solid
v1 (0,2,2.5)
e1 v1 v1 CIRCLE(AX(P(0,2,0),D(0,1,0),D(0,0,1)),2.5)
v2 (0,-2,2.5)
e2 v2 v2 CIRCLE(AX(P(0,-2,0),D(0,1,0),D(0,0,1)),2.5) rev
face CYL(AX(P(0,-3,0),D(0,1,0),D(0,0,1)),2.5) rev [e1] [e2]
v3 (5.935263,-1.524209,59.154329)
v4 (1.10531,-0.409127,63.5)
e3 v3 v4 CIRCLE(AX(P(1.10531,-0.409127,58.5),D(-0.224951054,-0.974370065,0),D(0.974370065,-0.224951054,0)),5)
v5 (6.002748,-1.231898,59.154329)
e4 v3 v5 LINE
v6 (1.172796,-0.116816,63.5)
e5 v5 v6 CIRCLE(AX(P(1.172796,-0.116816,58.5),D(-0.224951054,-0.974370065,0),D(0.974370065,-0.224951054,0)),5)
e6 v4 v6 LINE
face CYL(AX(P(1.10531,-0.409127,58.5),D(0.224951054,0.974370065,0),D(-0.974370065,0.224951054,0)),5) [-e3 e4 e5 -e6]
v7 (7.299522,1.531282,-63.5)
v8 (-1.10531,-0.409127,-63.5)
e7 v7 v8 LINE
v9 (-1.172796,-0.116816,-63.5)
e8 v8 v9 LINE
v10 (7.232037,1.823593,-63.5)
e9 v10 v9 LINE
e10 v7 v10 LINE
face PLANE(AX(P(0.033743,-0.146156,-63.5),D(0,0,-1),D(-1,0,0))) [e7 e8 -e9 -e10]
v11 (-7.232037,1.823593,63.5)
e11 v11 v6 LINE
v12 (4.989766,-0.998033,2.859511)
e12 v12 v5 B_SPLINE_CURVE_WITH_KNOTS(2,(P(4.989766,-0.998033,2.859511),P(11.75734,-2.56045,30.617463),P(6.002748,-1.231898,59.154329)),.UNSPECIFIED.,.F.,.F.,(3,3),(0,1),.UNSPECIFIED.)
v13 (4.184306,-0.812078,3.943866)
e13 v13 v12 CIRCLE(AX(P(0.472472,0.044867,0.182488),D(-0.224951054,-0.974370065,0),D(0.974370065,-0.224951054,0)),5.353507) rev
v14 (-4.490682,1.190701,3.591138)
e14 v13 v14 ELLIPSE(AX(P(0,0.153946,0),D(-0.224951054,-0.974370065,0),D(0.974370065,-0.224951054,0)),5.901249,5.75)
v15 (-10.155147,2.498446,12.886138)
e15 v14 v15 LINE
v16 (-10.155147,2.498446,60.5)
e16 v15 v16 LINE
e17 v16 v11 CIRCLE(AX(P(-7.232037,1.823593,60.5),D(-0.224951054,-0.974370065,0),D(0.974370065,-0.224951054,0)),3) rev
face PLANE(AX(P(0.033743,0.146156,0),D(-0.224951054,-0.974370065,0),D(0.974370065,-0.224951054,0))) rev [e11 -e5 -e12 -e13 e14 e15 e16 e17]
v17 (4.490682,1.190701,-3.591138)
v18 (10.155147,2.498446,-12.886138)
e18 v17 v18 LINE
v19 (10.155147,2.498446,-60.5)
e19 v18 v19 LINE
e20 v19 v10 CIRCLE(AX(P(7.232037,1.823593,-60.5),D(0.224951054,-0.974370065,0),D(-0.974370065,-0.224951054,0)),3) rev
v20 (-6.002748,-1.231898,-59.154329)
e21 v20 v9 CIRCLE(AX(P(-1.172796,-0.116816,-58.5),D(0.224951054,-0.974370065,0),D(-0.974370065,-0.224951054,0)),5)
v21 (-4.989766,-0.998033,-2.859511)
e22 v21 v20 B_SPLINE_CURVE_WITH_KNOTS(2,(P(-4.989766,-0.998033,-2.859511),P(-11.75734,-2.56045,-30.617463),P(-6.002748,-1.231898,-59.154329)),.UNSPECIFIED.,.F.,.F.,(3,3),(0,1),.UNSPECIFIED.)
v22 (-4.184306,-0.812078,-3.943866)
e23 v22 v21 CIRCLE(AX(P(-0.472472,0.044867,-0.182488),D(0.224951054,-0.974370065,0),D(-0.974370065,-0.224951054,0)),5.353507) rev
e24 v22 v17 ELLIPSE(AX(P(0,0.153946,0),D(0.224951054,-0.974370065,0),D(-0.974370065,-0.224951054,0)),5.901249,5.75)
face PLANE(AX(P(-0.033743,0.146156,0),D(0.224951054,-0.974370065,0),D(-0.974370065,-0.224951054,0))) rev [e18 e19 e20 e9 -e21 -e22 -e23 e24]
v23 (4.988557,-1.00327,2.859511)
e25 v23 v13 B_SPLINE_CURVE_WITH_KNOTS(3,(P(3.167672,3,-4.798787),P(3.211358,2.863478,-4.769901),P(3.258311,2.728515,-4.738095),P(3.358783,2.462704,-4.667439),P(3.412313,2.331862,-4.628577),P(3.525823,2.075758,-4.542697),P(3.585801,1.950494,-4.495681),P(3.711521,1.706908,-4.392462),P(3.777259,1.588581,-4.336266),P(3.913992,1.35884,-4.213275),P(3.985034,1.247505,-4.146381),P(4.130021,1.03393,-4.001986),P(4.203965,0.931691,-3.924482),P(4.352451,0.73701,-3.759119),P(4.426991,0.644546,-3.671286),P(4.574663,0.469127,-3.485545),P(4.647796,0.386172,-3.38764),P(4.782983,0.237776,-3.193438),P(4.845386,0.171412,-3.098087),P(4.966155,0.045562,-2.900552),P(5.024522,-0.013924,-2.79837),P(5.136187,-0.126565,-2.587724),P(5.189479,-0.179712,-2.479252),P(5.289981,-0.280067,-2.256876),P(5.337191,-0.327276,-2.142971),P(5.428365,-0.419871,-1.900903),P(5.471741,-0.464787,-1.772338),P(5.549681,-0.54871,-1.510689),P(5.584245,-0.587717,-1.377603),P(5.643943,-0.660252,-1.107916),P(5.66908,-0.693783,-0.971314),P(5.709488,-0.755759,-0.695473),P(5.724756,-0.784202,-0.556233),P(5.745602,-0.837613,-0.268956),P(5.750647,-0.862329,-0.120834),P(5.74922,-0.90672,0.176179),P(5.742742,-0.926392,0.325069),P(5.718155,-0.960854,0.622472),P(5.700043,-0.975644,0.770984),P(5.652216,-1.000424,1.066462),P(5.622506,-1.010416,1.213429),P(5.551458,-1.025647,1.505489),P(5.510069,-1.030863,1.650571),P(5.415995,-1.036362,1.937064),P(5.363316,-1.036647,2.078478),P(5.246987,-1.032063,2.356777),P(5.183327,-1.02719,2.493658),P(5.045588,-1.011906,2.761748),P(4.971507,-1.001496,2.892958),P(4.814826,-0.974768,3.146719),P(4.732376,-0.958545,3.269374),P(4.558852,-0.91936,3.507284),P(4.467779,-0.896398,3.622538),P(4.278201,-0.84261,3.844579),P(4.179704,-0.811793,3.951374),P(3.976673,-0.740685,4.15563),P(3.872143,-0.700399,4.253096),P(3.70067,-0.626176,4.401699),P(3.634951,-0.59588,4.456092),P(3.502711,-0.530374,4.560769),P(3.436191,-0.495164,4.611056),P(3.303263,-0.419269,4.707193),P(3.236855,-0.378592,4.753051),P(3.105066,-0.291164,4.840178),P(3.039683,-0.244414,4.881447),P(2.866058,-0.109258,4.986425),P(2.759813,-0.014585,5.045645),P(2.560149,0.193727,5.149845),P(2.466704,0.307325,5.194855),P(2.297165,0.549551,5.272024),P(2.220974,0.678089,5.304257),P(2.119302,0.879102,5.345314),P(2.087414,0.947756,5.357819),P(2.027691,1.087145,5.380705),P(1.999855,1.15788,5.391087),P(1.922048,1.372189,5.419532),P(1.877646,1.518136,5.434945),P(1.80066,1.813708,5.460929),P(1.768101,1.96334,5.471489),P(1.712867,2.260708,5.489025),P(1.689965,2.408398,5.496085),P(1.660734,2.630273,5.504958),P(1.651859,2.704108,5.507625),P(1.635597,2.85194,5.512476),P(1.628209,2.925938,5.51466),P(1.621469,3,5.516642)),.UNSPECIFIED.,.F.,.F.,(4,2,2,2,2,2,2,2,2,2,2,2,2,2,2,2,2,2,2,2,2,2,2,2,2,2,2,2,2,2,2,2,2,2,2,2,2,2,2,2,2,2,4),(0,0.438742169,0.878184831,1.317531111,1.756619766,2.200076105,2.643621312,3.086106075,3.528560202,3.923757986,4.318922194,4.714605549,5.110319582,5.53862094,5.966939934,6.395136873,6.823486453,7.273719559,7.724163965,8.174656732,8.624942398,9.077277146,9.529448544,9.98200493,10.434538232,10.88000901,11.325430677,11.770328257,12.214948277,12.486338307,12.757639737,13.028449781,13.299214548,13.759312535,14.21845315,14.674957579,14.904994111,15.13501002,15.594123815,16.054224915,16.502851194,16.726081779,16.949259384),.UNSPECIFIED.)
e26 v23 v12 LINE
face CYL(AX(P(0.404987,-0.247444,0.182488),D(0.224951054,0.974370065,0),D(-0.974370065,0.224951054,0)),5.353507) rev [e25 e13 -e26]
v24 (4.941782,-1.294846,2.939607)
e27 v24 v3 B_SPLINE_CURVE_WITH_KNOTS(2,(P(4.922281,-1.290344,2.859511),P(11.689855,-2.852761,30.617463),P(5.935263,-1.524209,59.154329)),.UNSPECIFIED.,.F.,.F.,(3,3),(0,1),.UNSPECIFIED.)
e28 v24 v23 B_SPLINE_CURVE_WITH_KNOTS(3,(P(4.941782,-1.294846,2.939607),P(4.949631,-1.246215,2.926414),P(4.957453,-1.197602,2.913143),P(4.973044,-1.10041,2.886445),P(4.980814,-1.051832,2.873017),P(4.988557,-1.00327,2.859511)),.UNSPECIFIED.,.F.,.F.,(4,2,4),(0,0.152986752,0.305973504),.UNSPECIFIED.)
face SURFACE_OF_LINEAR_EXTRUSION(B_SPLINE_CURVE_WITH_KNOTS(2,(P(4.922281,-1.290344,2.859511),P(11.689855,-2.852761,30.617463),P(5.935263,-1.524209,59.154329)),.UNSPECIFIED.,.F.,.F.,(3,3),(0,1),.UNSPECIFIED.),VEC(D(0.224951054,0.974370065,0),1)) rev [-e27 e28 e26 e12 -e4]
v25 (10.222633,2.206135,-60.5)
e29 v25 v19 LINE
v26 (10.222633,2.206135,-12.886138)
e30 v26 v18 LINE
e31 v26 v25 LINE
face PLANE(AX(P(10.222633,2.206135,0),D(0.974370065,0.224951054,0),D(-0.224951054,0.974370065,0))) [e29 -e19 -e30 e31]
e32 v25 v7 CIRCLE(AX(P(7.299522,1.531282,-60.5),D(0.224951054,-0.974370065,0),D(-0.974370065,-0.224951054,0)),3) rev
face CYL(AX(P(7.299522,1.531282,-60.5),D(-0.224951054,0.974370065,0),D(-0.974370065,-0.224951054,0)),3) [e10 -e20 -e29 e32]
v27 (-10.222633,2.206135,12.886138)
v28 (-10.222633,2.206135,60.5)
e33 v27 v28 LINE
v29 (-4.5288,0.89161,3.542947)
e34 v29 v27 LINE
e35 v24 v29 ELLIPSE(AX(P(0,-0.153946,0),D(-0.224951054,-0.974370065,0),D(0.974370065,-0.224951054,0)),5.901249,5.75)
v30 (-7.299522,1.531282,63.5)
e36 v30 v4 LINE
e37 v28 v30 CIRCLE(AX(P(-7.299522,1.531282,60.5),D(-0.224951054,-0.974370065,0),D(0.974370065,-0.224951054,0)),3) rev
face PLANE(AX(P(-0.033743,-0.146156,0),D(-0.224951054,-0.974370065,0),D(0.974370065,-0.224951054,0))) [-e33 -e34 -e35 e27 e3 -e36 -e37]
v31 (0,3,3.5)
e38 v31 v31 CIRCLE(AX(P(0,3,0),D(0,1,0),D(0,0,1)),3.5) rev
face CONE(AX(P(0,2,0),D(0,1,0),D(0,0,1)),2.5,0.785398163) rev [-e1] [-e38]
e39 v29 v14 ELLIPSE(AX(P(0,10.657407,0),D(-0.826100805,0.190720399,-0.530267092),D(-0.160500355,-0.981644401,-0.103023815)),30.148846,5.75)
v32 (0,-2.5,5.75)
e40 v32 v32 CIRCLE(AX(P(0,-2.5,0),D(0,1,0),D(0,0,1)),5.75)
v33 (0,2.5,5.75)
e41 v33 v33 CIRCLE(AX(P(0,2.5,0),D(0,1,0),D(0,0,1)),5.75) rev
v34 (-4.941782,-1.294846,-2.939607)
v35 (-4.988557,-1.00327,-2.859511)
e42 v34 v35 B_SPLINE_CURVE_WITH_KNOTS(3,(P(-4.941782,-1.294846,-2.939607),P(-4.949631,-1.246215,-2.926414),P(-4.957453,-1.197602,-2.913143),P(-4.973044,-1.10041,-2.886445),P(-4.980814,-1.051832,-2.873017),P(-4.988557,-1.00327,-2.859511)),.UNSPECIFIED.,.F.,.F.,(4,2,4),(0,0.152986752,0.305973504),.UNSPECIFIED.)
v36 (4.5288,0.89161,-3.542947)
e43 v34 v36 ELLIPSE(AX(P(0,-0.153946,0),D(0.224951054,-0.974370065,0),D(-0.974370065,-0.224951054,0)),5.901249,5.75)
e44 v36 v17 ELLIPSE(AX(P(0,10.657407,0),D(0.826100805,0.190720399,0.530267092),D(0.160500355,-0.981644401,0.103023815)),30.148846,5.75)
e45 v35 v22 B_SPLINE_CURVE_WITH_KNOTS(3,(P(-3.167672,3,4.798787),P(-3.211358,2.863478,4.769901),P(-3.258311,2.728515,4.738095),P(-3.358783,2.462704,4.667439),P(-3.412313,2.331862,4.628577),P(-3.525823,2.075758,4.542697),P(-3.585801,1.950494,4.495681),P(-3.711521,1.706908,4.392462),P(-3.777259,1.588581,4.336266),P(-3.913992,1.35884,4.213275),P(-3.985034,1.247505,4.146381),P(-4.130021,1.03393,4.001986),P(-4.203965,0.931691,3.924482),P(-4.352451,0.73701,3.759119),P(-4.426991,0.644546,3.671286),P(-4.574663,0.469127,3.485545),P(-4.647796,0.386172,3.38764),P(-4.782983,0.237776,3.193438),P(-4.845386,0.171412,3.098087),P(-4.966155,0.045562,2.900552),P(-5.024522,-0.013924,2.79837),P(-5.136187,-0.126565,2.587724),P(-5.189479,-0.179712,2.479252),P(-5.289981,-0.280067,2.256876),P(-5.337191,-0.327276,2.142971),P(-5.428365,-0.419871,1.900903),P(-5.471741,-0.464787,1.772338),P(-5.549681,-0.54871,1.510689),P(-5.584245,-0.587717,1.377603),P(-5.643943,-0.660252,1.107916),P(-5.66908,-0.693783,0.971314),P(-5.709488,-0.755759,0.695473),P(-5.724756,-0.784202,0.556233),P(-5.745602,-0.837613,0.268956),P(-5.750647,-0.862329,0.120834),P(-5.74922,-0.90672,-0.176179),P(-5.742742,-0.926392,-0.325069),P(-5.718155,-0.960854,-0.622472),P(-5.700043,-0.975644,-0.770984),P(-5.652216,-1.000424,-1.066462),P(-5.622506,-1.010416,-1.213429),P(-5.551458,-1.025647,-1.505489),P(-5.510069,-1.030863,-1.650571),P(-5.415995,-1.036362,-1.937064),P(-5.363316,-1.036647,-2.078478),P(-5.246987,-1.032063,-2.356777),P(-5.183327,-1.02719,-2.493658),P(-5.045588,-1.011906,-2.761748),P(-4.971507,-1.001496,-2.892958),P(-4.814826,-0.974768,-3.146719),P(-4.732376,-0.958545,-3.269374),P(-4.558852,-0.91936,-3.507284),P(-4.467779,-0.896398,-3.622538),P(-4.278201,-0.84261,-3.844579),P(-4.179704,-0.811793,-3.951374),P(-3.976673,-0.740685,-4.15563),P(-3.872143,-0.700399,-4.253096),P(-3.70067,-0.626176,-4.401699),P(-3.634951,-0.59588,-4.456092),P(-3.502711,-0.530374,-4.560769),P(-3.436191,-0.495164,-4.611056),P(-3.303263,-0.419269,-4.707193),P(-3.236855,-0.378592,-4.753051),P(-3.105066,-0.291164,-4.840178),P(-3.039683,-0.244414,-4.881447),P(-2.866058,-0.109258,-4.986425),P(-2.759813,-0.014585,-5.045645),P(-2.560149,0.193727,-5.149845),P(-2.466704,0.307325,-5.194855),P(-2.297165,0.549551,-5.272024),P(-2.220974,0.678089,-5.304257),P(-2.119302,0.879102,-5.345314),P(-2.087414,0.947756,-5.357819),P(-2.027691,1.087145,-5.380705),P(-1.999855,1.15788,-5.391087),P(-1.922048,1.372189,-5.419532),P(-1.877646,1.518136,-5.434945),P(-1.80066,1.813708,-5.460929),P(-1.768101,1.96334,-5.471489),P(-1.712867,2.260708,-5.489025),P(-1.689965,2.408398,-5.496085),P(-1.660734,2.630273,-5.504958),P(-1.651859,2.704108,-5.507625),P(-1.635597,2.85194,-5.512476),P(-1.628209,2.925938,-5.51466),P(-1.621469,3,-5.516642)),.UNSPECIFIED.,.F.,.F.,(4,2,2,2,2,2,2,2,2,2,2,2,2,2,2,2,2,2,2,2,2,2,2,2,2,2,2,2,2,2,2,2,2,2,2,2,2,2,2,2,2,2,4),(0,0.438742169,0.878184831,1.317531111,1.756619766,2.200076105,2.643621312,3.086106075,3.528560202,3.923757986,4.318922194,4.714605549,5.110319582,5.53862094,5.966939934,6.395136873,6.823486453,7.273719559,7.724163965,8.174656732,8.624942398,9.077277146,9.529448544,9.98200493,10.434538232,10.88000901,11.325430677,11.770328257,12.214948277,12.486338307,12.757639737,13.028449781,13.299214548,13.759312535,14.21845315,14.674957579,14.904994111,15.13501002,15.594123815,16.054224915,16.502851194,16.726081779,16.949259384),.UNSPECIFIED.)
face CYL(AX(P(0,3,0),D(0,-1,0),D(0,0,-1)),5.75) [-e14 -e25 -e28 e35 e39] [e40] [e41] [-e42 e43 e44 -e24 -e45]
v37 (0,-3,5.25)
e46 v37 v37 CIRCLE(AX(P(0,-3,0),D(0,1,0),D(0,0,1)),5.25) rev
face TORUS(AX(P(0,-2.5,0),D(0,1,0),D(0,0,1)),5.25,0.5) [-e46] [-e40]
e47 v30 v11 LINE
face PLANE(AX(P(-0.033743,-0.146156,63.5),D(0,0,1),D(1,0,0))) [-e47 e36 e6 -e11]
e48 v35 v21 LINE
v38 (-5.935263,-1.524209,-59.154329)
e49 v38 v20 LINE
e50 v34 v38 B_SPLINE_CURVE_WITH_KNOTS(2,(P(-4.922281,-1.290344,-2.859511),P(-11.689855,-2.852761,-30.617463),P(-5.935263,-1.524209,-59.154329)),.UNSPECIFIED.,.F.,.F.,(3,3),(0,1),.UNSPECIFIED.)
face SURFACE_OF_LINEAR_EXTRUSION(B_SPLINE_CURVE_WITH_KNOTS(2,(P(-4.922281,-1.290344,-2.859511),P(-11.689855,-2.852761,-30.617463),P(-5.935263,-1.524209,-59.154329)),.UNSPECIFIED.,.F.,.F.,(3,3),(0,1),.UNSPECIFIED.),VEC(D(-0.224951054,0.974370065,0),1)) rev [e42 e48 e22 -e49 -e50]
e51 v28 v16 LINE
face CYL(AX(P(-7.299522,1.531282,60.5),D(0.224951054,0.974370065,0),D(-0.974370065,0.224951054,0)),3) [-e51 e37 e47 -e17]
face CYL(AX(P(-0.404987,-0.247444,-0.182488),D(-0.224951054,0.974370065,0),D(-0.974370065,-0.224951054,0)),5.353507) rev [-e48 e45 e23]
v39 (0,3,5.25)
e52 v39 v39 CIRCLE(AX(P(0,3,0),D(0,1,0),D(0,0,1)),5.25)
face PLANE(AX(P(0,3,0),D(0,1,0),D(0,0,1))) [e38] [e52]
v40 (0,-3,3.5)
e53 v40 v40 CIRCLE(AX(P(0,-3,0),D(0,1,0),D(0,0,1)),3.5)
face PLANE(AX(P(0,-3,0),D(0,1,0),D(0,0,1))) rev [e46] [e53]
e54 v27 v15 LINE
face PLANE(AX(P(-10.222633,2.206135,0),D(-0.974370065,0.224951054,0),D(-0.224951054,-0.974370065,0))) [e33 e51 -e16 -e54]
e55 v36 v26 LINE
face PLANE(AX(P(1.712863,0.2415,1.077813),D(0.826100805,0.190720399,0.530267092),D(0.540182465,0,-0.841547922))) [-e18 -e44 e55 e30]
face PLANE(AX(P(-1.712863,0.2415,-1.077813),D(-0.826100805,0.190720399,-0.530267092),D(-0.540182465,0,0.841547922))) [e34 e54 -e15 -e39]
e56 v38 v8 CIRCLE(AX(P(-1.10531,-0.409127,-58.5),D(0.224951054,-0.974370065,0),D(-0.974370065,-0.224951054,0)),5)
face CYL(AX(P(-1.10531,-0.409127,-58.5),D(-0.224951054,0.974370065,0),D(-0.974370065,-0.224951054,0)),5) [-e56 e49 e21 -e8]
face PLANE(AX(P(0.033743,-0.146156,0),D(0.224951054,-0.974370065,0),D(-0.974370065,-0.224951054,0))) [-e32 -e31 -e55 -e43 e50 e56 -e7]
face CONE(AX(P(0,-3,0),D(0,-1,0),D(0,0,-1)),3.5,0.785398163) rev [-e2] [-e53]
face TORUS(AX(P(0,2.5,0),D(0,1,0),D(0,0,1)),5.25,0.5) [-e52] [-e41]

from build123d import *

# Parameters (mm, degrees)
SKETCH1_R           = 5.75
BOSS_EXTRUDE1_DEPTH = 3
BOSS_EXTRUDE3_DEPTH = 0.15
CIRPATTERN1_COUNT   = 2
SKETCH5_R           = 2.5
CUT_EXTRUDE1_DEPTH  = 65.596843827
FILLET1_R           = 0.5
FILLET2_SIZE        = 1


with BuildPart() as part:
    # Sketch1 → Boss-Extrude1 (new, symmetric)
    with BuildSketch(Plane(origin=(0, 0, 0), x_dir=(1, 0, 0), z_dir=(0, 1, 0))):
        Circle(SKETCH1_R)
    extrude(amount=BOSS_EXTRUDE1_DEPTH, both=True)

    # Sketch3 → Boss-Extrude3 (add, symmetric)
    with BuildSketch(Plane(origin=(0, 0, 0), x_dir=(0.9743700647852351, -0.22495105434386542, 0), z_dir=(-0.22495105434386542, -0.9743700647852351, 0))):
        with BuildLine():
            Line((-10.456899563, 12.886138045), (-4.185847137, 2.859510833))
            ThreePointArc((-4.185847137, 2.859510833), (0.450269951, 5.535994412), (5.086387038, 2.859510833))
            add(Edge.make_bspline(
                [(5.086387038, 2.859510833), (5.150424067, 3.115433935), (5.21336865, 3.371423248)],
                knots=[0, 0, 0, 0.009219812, 0.009219812, 0.009219812], degree=2))
            add(Edge.make_bspline(
                [(5.21336865, 3.371423248), (11.977524608, 30.880567729), (6.126015088, 59.154329089)],
                knots=[0.009219812, 0.009219812, 0.009219812, 1, 1, 1], degree=2))
            ThreePointArc((6.126015088, 59.154329089), (4.465099784, 62.259763653), (1.16901464, 63.5))
            Line((1.16901464, 63.5), (-7.456899563, 63.5))
            ThreePointArc((-7.456899563, 63.5), (-9.578219907, 62.621320344), (-10.456899563, 60.5))
            Line((-10.456899563, 60.5), (-10.456899563, 12.886138045))
        make_face()
    boss_extrude3 = extrude(amount=BOSS_EXTRUDE3_DEPTH, both=True)

    # CirPattern1: Boss-Extrude3 ×2 about axis
    cirpattern1_axis = Axis((0, 3, 0), (0, -1, 0))
    for i in range(1, CIRPATTERN1_COUNT):
        add(boss_extrude3.rotate(cirpattern1_axis, i * 360 / CIRPATTERN1_COUNT))

    # Sketch5 → Cut-Extrude1 (cut, through all)
    with BuildSketch(Plane(origin=(0, 3, 0), x_dir=(1, 0, 0), z_dir=(0, 1, 0))):
        Circle(SKETCH5_R)
    extrude(amount=-CUT_EXTRUDE1_DEPTH, mode=Mode.SUBTRACT)

    # Fillet1
    fillet1_edges = [part.edges().sort_by_distance(p)[0] for p in [
        (-5.75, -3, 0),
        (-5.75, 3, 0),
    ]]
    fillet(fillet1_edges, radius=FILLET1_R)

    # Fillet2
    fillet2_edges = [part.edges().sort_by_distance(p)[0] for p in [
        (-2.5, -3, 0),
        (-2.5, 3, 0),
    ]]
    chamfer(fillet2_edges, length=FILLET2_SIZE)


solid = part.part
